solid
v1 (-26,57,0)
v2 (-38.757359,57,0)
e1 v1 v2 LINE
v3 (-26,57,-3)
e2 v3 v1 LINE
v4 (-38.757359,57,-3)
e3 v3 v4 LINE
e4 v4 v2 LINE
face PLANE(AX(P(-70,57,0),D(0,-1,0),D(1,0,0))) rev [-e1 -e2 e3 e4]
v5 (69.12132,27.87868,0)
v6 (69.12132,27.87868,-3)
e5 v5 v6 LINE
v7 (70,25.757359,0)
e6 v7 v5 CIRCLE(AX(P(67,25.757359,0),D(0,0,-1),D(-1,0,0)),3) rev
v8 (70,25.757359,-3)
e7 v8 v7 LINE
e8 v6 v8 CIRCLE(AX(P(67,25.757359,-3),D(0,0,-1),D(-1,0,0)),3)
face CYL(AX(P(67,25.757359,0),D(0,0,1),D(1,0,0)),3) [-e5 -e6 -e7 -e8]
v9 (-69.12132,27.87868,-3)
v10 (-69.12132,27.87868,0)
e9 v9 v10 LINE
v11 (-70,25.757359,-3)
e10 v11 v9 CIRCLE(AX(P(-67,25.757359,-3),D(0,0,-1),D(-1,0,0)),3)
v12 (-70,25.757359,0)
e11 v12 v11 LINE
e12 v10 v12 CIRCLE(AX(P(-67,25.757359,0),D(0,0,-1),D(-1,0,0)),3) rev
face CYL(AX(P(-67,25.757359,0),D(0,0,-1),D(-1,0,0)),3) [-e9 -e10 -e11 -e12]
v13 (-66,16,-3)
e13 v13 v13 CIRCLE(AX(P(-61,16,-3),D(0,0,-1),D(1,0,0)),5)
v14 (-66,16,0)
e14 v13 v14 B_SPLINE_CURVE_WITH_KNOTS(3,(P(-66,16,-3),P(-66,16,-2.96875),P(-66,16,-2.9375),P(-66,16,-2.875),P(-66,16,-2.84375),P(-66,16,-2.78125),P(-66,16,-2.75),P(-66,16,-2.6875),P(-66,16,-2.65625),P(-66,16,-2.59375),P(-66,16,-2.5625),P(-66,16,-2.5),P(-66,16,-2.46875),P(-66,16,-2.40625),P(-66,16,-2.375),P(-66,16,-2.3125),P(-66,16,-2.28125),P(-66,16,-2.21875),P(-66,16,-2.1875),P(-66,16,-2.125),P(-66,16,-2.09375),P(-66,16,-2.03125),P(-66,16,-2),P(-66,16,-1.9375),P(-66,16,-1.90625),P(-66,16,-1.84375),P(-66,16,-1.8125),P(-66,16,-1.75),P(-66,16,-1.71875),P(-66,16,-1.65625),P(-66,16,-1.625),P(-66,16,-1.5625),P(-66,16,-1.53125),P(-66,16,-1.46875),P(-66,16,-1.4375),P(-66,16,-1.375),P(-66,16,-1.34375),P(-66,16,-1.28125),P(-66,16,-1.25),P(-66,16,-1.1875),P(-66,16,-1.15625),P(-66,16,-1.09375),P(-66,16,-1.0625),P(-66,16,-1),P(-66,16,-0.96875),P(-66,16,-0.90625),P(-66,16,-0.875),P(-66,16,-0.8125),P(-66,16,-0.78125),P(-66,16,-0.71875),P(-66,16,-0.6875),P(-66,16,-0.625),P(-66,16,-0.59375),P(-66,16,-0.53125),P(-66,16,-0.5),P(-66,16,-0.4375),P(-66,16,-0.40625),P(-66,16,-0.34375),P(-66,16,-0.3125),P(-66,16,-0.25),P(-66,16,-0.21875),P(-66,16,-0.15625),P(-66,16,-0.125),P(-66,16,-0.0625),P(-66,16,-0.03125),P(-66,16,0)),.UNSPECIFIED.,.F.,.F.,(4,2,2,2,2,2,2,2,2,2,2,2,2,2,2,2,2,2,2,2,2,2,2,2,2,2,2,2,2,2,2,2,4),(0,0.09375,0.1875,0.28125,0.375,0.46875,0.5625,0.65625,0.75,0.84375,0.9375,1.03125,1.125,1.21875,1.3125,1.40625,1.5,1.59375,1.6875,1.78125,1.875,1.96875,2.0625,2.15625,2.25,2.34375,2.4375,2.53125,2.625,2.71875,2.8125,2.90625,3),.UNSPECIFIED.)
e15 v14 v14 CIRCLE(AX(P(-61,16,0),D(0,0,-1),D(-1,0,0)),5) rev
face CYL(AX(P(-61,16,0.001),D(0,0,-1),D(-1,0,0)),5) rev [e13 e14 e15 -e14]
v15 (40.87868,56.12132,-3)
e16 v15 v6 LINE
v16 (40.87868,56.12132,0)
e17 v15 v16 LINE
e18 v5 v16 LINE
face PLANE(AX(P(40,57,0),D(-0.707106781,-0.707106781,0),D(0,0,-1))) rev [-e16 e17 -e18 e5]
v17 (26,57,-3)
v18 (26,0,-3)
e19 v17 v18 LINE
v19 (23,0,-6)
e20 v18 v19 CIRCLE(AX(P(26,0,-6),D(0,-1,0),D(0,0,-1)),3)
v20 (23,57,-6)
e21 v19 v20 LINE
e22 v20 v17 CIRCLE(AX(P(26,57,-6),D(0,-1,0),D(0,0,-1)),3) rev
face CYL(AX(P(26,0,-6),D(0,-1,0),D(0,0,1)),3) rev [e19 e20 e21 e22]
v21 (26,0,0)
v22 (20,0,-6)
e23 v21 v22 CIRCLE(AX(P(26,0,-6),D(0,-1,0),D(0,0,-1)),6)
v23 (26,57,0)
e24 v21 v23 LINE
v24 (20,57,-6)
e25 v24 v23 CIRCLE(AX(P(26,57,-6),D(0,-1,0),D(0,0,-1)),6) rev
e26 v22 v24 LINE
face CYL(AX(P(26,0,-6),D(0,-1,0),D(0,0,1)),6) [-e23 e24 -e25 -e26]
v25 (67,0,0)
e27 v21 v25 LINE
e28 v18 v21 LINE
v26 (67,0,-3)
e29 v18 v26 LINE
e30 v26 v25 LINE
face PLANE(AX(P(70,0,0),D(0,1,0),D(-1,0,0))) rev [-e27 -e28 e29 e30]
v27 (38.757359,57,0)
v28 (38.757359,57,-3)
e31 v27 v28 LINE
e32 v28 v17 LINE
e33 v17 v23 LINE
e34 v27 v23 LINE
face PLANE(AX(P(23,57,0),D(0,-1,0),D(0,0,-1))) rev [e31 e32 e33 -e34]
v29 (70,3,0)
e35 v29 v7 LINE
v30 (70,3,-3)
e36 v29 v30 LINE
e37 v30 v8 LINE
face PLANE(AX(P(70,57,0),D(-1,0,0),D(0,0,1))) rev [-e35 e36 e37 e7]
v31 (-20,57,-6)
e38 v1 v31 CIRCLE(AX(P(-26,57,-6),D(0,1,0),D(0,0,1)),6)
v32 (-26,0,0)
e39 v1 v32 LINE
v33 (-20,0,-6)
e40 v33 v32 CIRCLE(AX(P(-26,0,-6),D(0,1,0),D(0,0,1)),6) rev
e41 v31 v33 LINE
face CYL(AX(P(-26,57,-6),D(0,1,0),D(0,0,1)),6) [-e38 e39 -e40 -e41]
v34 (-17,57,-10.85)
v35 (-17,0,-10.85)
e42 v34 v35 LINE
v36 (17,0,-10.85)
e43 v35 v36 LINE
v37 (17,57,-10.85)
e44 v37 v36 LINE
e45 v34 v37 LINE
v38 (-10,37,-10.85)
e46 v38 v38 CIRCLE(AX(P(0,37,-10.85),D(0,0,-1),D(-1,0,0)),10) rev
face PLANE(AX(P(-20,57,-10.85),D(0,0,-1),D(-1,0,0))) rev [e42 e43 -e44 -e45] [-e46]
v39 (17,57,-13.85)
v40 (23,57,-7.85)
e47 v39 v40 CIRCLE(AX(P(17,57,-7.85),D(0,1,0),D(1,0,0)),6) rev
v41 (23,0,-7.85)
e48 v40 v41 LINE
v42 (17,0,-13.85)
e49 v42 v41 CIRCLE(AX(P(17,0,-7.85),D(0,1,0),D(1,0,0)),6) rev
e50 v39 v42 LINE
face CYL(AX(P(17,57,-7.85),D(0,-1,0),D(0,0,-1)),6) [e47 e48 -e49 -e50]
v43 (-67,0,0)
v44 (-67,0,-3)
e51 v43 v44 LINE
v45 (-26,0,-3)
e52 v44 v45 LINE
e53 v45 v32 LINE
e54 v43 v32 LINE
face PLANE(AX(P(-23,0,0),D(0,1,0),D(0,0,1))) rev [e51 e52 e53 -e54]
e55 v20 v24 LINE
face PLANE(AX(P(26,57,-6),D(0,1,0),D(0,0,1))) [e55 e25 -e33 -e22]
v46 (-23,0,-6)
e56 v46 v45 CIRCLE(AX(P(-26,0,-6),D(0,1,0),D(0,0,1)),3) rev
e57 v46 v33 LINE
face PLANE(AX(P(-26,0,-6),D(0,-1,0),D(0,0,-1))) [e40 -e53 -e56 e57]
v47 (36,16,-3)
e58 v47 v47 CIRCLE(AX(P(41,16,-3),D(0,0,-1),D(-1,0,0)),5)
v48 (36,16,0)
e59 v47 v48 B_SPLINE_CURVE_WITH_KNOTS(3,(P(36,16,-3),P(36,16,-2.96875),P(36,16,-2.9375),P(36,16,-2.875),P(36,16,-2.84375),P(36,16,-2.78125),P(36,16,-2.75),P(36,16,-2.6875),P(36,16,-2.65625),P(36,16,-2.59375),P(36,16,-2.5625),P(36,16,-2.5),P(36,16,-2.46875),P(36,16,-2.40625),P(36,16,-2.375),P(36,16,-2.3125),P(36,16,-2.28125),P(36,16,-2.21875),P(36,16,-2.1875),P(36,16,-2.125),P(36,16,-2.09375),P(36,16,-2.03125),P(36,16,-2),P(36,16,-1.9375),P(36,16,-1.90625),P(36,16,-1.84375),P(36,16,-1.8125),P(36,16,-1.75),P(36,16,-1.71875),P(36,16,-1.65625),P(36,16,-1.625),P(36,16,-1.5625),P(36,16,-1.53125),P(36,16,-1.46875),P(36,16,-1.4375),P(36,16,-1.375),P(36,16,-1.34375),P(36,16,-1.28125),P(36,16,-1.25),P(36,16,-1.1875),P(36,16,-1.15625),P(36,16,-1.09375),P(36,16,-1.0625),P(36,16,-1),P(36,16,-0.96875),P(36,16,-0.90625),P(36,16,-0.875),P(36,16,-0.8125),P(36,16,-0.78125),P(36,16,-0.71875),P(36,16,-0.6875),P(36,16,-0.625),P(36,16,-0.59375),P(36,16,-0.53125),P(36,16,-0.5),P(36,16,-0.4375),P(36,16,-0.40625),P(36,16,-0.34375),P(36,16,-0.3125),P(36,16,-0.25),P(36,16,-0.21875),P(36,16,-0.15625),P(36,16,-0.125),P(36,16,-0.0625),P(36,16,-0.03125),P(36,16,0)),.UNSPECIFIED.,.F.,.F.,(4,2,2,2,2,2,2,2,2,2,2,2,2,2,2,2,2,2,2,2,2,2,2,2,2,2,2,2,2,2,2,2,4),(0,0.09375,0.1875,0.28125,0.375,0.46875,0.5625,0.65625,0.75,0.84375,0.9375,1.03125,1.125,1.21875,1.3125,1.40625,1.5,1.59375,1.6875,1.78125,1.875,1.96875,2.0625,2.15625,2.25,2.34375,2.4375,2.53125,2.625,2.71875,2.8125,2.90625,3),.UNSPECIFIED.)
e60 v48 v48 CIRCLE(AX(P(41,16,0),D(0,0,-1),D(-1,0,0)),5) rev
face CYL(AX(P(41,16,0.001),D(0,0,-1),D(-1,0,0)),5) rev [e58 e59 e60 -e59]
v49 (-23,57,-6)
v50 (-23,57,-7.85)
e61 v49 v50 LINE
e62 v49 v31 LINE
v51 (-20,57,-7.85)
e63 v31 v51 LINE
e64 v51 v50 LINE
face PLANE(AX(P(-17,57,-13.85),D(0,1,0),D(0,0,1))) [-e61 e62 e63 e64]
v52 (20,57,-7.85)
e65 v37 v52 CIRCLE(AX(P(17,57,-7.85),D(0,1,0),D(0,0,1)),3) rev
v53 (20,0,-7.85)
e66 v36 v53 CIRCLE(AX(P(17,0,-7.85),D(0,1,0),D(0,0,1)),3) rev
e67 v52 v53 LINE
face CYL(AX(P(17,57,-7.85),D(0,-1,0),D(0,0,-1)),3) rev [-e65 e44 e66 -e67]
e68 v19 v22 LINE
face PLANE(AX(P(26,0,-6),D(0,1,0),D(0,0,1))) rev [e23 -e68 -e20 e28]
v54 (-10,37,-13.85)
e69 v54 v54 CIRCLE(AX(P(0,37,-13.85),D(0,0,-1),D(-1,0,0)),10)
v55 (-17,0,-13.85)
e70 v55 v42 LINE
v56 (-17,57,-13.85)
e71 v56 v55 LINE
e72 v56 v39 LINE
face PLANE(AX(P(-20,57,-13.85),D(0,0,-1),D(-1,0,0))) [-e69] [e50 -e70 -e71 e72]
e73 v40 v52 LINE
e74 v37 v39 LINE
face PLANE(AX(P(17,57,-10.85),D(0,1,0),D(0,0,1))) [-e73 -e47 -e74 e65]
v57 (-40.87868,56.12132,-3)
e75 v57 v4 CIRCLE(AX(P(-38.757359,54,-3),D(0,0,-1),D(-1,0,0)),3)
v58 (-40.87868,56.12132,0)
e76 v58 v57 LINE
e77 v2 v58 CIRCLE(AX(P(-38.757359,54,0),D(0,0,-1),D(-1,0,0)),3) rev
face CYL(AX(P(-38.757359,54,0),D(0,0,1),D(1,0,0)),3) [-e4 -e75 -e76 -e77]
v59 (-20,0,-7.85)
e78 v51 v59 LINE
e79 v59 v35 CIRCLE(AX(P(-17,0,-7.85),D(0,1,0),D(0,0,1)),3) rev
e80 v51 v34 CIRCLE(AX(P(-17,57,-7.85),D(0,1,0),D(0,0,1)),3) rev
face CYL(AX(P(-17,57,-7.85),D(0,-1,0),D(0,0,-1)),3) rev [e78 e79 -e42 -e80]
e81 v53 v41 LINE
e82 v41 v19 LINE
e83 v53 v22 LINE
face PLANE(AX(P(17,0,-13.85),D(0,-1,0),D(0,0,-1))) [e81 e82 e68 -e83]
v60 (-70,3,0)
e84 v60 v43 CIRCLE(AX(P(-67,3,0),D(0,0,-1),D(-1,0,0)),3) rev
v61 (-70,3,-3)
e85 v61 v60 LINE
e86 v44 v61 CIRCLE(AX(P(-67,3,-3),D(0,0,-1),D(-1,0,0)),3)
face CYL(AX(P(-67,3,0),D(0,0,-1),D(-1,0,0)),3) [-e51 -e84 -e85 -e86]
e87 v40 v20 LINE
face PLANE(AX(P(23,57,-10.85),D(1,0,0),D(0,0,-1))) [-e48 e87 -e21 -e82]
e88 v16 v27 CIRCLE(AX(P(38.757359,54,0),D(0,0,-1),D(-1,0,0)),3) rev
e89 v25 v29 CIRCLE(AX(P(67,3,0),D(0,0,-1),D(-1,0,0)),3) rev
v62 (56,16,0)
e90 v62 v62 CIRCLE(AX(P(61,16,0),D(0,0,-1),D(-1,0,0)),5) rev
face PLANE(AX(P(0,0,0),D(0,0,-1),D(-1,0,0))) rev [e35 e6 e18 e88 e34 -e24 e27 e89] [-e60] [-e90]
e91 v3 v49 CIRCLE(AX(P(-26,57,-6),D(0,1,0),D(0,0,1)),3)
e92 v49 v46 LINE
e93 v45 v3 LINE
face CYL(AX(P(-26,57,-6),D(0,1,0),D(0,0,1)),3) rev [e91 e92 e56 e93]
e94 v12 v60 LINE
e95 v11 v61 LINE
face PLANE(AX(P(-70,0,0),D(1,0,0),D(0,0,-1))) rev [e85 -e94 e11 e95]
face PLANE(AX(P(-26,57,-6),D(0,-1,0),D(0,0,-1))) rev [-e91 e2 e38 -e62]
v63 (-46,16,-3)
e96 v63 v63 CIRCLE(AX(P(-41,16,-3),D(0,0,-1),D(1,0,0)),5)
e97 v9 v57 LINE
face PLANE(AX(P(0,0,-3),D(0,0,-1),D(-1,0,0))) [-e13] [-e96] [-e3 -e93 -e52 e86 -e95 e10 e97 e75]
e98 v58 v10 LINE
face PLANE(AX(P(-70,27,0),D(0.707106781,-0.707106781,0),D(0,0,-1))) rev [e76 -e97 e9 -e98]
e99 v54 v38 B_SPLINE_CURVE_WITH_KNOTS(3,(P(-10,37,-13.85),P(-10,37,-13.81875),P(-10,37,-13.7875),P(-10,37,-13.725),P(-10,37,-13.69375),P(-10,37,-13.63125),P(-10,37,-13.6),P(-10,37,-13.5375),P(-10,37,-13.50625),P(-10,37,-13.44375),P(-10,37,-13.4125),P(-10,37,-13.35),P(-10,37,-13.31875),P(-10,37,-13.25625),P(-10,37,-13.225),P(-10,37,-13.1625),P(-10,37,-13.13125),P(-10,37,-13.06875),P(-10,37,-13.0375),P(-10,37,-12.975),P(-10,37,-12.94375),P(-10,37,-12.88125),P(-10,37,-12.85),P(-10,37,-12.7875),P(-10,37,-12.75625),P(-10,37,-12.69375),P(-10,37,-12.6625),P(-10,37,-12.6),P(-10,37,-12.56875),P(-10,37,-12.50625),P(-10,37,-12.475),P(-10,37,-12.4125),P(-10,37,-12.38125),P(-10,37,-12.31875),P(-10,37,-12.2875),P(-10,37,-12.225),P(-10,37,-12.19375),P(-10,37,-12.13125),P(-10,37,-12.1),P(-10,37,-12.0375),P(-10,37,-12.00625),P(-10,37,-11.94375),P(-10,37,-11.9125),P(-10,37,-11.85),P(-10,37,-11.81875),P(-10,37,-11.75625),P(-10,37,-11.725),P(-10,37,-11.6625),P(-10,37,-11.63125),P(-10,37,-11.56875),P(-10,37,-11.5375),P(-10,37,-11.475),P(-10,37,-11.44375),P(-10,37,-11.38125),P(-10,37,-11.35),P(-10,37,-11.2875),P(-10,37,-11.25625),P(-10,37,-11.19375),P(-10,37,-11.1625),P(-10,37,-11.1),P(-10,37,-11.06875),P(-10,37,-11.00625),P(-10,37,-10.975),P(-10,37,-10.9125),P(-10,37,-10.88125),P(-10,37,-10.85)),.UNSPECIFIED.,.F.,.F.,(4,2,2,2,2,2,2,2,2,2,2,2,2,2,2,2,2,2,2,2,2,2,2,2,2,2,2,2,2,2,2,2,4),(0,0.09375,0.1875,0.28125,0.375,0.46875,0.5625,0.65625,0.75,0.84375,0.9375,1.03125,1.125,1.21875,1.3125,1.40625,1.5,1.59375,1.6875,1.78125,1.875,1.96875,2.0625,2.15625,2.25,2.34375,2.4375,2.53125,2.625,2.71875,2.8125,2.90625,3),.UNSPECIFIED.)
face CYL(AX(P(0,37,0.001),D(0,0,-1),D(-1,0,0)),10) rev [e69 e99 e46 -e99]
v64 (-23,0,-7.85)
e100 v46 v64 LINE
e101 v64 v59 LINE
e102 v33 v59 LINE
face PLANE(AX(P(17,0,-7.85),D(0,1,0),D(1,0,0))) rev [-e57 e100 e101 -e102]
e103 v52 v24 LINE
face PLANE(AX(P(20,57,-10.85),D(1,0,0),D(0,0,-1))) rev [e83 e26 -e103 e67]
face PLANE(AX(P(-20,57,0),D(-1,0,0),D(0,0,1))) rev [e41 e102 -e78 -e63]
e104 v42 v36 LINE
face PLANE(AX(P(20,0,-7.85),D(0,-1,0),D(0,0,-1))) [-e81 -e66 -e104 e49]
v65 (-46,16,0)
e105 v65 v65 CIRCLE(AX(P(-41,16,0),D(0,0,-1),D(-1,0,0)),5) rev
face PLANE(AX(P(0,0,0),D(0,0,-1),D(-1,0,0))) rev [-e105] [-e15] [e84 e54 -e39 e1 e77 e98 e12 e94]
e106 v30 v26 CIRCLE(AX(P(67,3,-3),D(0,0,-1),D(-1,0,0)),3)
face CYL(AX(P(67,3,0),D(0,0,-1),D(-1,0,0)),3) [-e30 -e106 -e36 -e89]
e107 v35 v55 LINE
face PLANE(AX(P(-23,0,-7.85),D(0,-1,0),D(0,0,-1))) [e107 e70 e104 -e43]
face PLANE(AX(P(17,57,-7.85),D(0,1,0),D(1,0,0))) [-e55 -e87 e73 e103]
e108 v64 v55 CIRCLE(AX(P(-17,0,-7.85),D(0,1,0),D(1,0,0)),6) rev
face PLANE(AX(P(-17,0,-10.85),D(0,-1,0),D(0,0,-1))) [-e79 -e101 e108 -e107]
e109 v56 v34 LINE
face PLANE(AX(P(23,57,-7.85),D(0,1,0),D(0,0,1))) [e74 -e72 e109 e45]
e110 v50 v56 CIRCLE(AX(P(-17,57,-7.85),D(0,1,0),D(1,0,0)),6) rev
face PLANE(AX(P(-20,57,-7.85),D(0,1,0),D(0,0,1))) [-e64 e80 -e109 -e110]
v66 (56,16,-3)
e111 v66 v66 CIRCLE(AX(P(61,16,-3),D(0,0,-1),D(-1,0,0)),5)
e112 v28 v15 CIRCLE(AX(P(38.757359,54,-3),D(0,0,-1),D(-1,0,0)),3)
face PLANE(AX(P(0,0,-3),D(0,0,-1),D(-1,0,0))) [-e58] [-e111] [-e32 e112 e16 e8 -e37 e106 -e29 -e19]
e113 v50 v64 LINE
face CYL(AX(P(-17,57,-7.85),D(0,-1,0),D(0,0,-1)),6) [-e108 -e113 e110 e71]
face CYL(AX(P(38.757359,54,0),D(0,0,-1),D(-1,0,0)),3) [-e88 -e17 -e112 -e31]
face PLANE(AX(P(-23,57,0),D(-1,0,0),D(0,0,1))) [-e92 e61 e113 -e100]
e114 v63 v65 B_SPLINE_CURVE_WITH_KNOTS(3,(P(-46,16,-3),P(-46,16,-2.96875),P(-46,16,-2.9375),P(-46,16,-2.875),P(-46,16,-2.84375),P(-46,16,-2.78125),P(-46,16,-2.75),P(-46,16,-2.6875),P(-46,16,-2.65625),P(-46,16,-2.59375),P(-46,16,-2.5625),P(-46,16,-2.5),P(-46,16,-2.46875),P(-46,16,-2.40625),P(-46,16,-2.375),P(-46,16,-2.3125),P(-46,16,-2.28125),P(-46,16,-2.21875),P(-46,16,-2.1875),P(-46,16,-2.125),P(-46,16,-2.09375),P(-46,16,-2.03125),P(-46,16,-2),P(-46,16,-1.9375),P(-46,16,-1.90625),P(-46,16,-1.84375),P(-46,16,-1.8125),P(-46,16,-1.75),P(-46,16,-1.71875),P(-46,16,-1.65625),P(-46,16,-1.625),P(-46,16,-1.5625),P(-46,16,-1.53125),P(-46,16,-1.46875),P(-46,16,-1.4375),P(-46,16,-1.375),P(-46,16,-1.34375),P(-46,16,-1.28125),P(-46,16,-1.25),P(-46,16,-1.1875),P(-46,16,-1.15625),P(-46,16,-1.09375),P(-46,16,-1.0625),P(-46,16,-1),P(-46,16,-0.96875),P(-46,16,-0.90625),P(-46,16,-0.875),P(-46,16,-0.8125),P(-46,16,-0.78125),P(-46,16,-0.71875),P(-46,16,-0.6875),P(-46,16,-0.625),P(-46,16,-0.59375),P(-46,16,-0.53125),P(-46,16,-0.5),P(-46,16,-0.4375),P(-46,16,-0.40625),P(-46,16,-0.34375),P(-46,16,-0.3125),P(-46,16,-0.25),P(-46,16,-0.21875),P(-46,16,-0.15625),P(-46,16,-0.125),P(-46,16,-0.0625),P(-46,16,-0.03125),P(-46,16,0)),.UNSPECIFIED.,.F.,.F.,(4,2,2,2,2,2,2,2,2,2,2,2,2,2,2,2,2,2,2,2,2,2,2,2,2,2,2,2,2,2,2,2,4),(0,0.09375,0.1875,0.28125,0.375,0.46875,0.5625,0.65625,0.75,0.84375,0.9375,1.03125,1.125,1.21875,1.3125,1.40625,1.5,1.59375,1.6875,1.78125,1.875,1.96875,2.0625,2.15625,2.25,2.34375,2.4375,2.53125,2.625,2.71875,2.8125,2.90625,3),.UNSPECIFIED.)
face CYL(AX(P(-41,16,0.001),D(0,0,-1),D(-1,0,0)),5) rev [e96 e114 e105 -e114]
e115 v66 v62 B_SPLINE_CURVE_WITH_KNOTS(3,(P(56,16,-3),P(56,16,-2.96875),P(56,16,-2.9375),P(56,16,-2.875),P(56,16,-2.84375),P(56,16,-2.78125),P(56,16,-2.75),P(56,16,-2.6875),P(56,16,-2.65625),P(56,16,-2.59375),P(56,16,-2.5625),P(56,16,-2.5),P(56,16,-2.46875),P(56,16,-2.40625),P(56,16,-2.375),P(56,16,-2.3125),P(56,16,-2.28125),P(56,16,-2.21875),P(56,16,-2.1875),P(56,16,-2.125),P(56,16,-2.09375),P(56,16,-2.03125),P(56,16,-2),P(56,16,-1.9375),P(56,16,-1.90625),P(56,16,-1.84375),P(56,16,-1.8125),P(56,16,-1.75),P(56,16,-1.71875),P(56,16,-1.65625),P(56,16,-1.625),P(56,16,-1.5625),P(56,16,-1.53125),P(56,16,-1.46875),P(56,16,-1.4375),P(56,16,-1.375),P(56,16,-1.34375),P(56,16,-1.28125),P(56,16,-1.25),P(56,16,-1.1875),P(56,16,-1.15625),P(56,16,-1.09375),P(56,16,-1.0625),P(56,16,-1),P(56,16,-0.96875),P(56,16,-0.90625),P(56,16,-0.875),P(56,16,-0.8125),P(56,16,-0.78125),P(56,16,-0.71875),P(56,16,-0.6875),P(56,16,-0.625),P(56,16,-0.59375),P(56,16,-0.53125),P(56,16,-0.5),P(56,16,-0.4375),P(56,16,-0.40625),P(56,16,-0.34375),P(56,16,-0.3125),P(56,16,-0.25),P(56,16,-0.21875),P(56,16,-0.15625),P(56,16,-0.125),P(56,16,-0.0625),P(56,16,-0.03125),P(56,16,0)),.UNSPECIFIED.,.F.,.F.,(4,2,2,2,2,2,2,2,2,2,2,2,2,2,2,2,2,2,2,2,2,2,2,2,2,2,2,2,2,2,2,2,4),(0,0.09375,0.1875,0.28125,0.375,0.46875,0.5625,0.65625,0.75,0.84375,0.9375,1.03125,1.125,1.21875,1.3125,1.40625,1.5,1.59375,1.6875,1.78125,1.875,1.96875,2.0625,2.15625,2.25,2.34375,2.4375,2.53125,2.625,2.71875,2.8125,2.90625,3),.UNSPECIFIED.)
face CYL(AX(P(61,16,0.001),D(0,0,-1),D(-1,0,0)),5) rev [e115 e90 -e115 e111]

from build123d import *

# Parameters (mm, degrees)
BASE_FLANGE1_DEPTH             = 57
EDGE_FLANGE1_STRIP_W           = 18
EDGE_FLANGE1_STRIP_H           = 3
EDGE_FLANGE1_STRIP_CUT_DEPTH   = 57
EDGE_FLANGE1_STRIP_2_W         = 18
EDGE_FLANGE1_STRIP_2_H         = 3
EDGE_FLANGE1_STRIP_CUT_2_DEPTH = 57
EDGE_FLANGE1_DEPTH             = 57
EDGE_FLANGE1_BEND_DEPTH        = 57
CUT_EXTRUDE1_REACH             = 93.328
SKETCH12_R                     = 10
CHAMFER1_SIZE                  = 30
CUT_EXTRUDE2_REACH             = 92.922
SKETCH13_R                     = 5
FILLET1_R                      = 3


# Sheet-metal steps are written as plain solids
with BuildPart() as part:
    # Sketch1 → Base-Flange1 (new body)
    with BuildSketch(Plane(origin=(0, 0, 0), x_dir=(1, 0, 0), z_dir=(0, 1, 0))):
        with BuildLine():
            Line((-20, 0), (-20, 7.85))
            ThreePointArc((-20, 7.85), (-19.121320344, 9.971320344), (-17, 10.85))
            Line((-17, 10.85), (17, 10.85))
            ThreePointArc((17, 10.85), (19.121320344, 9.971320344), (20, 7.85))
            Line((20, 7.85), (20, 0))
            Line((20, 0), (23, 0))
            Line((23, 0), (23, 7.85))
            ThreePointArc((23, 7.85), (21.242640687, 12.092640687), (17, 13.85))
            Line((17, 13.85), (-17, 13.85))
            ThreePointArc((-17, 13.85), (-21.242640687, 12.092640687), (-23, 7.85))
            Line((-23, 7.85), (-23, 0))
            Line((-23, 0), (-20, 0))
        make_face()
    extrude(amount=BASE_FLANGE1_DEPTH)

    # Edge-Flange1 strip (across the edge) → Edge-Flange1 strip cut (cut)
    with BuildSketch(Plane(origin=(23, 57, 0), x_dir=(0, 0, -1), z_dir=(0, -1, 0))):
        with Locations((-3, -1.5)):
            Rectangle(EDGE_FLANGE1_STRIP_W, EDGE_FLANGE1_STRIP_H)
    extrude(amount=EDGE_FLANGE1_STRIP_CUT_DEPTH, mode=Mode.SUBTRACT)

    # Edge-Flange1 strip 2 (across the edge) → Edge-Flange1 strip cut 2 (cut)
    with BuildSketch(Plane(origin=(-23, 0, 0), x_dir=(0, 0, -1), z_dir=(0, 1, 0))):
        with Locations((-3, -1.5)):
            Rectangle(EDGE_FLANGE1_STRIP_2_W, EDGE_FLANGE1_STRIP_2_H)
    extrude(amount=EDGE_FLANGE1_STRIP_CUT_2_DEPTH, mode=Mode.SUBTRACT)

    # Edge-Flange1 section (across the edge) → Edge-Flange1 (add)
    with BuildSketch(Plane(origin=(23, 57, 0), x_dir=(0, 0, -1), z_dir=(0, -1, 0))):
        with BuildLine():
            Line((0, 3), (0, 47))
            Line((0, 47), (3, 47))
            Line((3, 47), (3, 3))
            ThreePointArc((3, 3), (3.878679656, 0.878679656), (6, 0))
            Line((6, 0), (6, -3))
            ThreePointArc((6, -3), (1.757359313, -1.242640687), (0, 3))
        make_face()
    extrude(amount=EDGE_FLANGE1_DEPTH)

    # Edge-Flange1 section 2 (across the edge) → Edge-Flange1 bend (add)
    with BuildSketch(Plane(origin=(-23, 0, 0), x_dir=(0, 0, -1), z_dir=(0, 1, 0))):
        with BuildLine():
            Line((0, 3), (0, 47))
            Line((0, 47), (3, 47))
            Line((3, 47), (3, 3))
            ThreePointArc((3, 3), (3.878679656, 0.878679656), (6, 0))
            Line((6, 0), (6, -3))
            ThreePointArc((6, -3), (1.757359313, -1.242640687), (0, 3))
        make_face()
    extrude(amount=EDGE_FLANGE1_BEND_DEPTH)

    # Sketch12 → Cut-Extrude1 (cut, up to next)
    with BuildSketch(Plane(origin=(0, 0, -13.85), x_dir=(-1, 0, 0), z_dir=(0, 0, -1)), mode=Mode.PRIVATE) as cut_extrude1_sk1:
        with Locations((0, 37)):
            Circle(SKETCH12_R)
    cut_extrude1_tool1 = extrude(cut_extrude1_sk1.sketch, amount=-CUT_EXTRUDE1_REACH, mode=Mode.PRIVATE) & part.part
    add(cut_extrude1_tool1.solids().sort_by_distance((0, 37, -13.85))[0], mode=Mode.SUBTRACT)

    # Chamfer1
    chamfer1_edges = [part.edges().sort_by_distance(p)[0] for p in [
        (70, 57, -1.5),
        (-70, 57, -1.5),
    ]]
    chamfer(chamfer1_edges, length=CHAMFER1_SIZE)

    # Sketch13 → Cut-Extrude2 (cut, up to next)
    with BuildSketch(Plane(origin=(0, 0, -3), x_dir=(-1, 0, 0), z_dir=(0, 0, -1)), mode=Mode.PRIVATE) as cut_extrude2_sk1:
        with Locations((-61, 16)):
            Circle(SKETCH13_R)
    cut_extrude2_tool1 = extrude(cut_extrude2_sk1.sketch, amount=-CUT_EXTRUDE2_REACH, mode=Mode.PRIVATE) & part.part
    # Sketch13 → Cut-Extrude2 (cut, up to next)
    with BuildSketch(Plane(origin=(0, 0, -3), x_dir=(-1, 0, 0), z_dir=(0, 0, -1)), mode=Mode.PRIVATE) as cut_extrude2_sk2:
        with Locations((-41, 16)):
            Circle(SKETCH13_R)
    cut_extrude2_tool2 = extrude(cut_extrude2_sk2.sketch, amount=-CUT_EXTRUDE2_REACH, mode=Mode.PRIVATE) & part.part
    # Sketch13 → Cut-Extrude2 (cut, up to next)
    with BuildSketch(Plane(origin=(0, 0, -3), x_dir=(-1, 0, 0), z_dir=(0, 0, -1)), mode=Mode.PRIVATE) as cut_extrude2_sk3:
        with Locations((41, 16)):
            Circle(SKETCH13_R)
    cut_extrude2_tool3 = extrude(cut_extrude2_sk3.sketch, amount=-CUT_EXTRUDE2_REACH, mode=Mode.PRIVATE) & part.part
    # Sketch13 → Cut-Extrude2 (cut, up to next)
    with BuildSketch(Plane(origin=(0, 0, -3), x_dir=(-1, 0, 0), z_dir=(0, 0, -1)), mode=Mode.PRIVATE) as cut_extrude2_sk4:
        with Locations((61, 16)):
            Circle(SKETCH13_R)
    cut_extrude2_tool4 = extrude(cut_extrude2_sk4.sketch, amount=-CUT_EXTRUDE2_REACH, mode=Mode.PRIVATE) & part.part
    add(cut_extrude2_tool1.solids().sort_by_distance((61, 16, -3))[0], mode=Mode.SUBTRACT)
    add(cut_extrude2_tool2.solids().sort_by_distance((41, 16, -3))[0], mode=Mode.SUBTRACT)
    add(cut_extrude2_tool3.solids().sort_by_distance((-41, 16, -3))[0], mode=Mode.SUBTRACT)
    add(cut_extrude2_tool4.solids().sort_by_distance((-61, 16, -3))[0], mode=Mode.SUBTRACT)

    # Fillet1
    fillet1_edges = [part.edges().sort_by_distance(p)[0] for p in [
        (-70, 27, -1.5),
        (-40, 57, -1.5),
        (40, 57, -1.5),
        (70, 27, -1.5),
        (70, 0, -1.5),
        (-70, 0, -1.5),
    ]]
    fillet(fillet1_edges, radius=FILLET1_R)


solid = part.part
